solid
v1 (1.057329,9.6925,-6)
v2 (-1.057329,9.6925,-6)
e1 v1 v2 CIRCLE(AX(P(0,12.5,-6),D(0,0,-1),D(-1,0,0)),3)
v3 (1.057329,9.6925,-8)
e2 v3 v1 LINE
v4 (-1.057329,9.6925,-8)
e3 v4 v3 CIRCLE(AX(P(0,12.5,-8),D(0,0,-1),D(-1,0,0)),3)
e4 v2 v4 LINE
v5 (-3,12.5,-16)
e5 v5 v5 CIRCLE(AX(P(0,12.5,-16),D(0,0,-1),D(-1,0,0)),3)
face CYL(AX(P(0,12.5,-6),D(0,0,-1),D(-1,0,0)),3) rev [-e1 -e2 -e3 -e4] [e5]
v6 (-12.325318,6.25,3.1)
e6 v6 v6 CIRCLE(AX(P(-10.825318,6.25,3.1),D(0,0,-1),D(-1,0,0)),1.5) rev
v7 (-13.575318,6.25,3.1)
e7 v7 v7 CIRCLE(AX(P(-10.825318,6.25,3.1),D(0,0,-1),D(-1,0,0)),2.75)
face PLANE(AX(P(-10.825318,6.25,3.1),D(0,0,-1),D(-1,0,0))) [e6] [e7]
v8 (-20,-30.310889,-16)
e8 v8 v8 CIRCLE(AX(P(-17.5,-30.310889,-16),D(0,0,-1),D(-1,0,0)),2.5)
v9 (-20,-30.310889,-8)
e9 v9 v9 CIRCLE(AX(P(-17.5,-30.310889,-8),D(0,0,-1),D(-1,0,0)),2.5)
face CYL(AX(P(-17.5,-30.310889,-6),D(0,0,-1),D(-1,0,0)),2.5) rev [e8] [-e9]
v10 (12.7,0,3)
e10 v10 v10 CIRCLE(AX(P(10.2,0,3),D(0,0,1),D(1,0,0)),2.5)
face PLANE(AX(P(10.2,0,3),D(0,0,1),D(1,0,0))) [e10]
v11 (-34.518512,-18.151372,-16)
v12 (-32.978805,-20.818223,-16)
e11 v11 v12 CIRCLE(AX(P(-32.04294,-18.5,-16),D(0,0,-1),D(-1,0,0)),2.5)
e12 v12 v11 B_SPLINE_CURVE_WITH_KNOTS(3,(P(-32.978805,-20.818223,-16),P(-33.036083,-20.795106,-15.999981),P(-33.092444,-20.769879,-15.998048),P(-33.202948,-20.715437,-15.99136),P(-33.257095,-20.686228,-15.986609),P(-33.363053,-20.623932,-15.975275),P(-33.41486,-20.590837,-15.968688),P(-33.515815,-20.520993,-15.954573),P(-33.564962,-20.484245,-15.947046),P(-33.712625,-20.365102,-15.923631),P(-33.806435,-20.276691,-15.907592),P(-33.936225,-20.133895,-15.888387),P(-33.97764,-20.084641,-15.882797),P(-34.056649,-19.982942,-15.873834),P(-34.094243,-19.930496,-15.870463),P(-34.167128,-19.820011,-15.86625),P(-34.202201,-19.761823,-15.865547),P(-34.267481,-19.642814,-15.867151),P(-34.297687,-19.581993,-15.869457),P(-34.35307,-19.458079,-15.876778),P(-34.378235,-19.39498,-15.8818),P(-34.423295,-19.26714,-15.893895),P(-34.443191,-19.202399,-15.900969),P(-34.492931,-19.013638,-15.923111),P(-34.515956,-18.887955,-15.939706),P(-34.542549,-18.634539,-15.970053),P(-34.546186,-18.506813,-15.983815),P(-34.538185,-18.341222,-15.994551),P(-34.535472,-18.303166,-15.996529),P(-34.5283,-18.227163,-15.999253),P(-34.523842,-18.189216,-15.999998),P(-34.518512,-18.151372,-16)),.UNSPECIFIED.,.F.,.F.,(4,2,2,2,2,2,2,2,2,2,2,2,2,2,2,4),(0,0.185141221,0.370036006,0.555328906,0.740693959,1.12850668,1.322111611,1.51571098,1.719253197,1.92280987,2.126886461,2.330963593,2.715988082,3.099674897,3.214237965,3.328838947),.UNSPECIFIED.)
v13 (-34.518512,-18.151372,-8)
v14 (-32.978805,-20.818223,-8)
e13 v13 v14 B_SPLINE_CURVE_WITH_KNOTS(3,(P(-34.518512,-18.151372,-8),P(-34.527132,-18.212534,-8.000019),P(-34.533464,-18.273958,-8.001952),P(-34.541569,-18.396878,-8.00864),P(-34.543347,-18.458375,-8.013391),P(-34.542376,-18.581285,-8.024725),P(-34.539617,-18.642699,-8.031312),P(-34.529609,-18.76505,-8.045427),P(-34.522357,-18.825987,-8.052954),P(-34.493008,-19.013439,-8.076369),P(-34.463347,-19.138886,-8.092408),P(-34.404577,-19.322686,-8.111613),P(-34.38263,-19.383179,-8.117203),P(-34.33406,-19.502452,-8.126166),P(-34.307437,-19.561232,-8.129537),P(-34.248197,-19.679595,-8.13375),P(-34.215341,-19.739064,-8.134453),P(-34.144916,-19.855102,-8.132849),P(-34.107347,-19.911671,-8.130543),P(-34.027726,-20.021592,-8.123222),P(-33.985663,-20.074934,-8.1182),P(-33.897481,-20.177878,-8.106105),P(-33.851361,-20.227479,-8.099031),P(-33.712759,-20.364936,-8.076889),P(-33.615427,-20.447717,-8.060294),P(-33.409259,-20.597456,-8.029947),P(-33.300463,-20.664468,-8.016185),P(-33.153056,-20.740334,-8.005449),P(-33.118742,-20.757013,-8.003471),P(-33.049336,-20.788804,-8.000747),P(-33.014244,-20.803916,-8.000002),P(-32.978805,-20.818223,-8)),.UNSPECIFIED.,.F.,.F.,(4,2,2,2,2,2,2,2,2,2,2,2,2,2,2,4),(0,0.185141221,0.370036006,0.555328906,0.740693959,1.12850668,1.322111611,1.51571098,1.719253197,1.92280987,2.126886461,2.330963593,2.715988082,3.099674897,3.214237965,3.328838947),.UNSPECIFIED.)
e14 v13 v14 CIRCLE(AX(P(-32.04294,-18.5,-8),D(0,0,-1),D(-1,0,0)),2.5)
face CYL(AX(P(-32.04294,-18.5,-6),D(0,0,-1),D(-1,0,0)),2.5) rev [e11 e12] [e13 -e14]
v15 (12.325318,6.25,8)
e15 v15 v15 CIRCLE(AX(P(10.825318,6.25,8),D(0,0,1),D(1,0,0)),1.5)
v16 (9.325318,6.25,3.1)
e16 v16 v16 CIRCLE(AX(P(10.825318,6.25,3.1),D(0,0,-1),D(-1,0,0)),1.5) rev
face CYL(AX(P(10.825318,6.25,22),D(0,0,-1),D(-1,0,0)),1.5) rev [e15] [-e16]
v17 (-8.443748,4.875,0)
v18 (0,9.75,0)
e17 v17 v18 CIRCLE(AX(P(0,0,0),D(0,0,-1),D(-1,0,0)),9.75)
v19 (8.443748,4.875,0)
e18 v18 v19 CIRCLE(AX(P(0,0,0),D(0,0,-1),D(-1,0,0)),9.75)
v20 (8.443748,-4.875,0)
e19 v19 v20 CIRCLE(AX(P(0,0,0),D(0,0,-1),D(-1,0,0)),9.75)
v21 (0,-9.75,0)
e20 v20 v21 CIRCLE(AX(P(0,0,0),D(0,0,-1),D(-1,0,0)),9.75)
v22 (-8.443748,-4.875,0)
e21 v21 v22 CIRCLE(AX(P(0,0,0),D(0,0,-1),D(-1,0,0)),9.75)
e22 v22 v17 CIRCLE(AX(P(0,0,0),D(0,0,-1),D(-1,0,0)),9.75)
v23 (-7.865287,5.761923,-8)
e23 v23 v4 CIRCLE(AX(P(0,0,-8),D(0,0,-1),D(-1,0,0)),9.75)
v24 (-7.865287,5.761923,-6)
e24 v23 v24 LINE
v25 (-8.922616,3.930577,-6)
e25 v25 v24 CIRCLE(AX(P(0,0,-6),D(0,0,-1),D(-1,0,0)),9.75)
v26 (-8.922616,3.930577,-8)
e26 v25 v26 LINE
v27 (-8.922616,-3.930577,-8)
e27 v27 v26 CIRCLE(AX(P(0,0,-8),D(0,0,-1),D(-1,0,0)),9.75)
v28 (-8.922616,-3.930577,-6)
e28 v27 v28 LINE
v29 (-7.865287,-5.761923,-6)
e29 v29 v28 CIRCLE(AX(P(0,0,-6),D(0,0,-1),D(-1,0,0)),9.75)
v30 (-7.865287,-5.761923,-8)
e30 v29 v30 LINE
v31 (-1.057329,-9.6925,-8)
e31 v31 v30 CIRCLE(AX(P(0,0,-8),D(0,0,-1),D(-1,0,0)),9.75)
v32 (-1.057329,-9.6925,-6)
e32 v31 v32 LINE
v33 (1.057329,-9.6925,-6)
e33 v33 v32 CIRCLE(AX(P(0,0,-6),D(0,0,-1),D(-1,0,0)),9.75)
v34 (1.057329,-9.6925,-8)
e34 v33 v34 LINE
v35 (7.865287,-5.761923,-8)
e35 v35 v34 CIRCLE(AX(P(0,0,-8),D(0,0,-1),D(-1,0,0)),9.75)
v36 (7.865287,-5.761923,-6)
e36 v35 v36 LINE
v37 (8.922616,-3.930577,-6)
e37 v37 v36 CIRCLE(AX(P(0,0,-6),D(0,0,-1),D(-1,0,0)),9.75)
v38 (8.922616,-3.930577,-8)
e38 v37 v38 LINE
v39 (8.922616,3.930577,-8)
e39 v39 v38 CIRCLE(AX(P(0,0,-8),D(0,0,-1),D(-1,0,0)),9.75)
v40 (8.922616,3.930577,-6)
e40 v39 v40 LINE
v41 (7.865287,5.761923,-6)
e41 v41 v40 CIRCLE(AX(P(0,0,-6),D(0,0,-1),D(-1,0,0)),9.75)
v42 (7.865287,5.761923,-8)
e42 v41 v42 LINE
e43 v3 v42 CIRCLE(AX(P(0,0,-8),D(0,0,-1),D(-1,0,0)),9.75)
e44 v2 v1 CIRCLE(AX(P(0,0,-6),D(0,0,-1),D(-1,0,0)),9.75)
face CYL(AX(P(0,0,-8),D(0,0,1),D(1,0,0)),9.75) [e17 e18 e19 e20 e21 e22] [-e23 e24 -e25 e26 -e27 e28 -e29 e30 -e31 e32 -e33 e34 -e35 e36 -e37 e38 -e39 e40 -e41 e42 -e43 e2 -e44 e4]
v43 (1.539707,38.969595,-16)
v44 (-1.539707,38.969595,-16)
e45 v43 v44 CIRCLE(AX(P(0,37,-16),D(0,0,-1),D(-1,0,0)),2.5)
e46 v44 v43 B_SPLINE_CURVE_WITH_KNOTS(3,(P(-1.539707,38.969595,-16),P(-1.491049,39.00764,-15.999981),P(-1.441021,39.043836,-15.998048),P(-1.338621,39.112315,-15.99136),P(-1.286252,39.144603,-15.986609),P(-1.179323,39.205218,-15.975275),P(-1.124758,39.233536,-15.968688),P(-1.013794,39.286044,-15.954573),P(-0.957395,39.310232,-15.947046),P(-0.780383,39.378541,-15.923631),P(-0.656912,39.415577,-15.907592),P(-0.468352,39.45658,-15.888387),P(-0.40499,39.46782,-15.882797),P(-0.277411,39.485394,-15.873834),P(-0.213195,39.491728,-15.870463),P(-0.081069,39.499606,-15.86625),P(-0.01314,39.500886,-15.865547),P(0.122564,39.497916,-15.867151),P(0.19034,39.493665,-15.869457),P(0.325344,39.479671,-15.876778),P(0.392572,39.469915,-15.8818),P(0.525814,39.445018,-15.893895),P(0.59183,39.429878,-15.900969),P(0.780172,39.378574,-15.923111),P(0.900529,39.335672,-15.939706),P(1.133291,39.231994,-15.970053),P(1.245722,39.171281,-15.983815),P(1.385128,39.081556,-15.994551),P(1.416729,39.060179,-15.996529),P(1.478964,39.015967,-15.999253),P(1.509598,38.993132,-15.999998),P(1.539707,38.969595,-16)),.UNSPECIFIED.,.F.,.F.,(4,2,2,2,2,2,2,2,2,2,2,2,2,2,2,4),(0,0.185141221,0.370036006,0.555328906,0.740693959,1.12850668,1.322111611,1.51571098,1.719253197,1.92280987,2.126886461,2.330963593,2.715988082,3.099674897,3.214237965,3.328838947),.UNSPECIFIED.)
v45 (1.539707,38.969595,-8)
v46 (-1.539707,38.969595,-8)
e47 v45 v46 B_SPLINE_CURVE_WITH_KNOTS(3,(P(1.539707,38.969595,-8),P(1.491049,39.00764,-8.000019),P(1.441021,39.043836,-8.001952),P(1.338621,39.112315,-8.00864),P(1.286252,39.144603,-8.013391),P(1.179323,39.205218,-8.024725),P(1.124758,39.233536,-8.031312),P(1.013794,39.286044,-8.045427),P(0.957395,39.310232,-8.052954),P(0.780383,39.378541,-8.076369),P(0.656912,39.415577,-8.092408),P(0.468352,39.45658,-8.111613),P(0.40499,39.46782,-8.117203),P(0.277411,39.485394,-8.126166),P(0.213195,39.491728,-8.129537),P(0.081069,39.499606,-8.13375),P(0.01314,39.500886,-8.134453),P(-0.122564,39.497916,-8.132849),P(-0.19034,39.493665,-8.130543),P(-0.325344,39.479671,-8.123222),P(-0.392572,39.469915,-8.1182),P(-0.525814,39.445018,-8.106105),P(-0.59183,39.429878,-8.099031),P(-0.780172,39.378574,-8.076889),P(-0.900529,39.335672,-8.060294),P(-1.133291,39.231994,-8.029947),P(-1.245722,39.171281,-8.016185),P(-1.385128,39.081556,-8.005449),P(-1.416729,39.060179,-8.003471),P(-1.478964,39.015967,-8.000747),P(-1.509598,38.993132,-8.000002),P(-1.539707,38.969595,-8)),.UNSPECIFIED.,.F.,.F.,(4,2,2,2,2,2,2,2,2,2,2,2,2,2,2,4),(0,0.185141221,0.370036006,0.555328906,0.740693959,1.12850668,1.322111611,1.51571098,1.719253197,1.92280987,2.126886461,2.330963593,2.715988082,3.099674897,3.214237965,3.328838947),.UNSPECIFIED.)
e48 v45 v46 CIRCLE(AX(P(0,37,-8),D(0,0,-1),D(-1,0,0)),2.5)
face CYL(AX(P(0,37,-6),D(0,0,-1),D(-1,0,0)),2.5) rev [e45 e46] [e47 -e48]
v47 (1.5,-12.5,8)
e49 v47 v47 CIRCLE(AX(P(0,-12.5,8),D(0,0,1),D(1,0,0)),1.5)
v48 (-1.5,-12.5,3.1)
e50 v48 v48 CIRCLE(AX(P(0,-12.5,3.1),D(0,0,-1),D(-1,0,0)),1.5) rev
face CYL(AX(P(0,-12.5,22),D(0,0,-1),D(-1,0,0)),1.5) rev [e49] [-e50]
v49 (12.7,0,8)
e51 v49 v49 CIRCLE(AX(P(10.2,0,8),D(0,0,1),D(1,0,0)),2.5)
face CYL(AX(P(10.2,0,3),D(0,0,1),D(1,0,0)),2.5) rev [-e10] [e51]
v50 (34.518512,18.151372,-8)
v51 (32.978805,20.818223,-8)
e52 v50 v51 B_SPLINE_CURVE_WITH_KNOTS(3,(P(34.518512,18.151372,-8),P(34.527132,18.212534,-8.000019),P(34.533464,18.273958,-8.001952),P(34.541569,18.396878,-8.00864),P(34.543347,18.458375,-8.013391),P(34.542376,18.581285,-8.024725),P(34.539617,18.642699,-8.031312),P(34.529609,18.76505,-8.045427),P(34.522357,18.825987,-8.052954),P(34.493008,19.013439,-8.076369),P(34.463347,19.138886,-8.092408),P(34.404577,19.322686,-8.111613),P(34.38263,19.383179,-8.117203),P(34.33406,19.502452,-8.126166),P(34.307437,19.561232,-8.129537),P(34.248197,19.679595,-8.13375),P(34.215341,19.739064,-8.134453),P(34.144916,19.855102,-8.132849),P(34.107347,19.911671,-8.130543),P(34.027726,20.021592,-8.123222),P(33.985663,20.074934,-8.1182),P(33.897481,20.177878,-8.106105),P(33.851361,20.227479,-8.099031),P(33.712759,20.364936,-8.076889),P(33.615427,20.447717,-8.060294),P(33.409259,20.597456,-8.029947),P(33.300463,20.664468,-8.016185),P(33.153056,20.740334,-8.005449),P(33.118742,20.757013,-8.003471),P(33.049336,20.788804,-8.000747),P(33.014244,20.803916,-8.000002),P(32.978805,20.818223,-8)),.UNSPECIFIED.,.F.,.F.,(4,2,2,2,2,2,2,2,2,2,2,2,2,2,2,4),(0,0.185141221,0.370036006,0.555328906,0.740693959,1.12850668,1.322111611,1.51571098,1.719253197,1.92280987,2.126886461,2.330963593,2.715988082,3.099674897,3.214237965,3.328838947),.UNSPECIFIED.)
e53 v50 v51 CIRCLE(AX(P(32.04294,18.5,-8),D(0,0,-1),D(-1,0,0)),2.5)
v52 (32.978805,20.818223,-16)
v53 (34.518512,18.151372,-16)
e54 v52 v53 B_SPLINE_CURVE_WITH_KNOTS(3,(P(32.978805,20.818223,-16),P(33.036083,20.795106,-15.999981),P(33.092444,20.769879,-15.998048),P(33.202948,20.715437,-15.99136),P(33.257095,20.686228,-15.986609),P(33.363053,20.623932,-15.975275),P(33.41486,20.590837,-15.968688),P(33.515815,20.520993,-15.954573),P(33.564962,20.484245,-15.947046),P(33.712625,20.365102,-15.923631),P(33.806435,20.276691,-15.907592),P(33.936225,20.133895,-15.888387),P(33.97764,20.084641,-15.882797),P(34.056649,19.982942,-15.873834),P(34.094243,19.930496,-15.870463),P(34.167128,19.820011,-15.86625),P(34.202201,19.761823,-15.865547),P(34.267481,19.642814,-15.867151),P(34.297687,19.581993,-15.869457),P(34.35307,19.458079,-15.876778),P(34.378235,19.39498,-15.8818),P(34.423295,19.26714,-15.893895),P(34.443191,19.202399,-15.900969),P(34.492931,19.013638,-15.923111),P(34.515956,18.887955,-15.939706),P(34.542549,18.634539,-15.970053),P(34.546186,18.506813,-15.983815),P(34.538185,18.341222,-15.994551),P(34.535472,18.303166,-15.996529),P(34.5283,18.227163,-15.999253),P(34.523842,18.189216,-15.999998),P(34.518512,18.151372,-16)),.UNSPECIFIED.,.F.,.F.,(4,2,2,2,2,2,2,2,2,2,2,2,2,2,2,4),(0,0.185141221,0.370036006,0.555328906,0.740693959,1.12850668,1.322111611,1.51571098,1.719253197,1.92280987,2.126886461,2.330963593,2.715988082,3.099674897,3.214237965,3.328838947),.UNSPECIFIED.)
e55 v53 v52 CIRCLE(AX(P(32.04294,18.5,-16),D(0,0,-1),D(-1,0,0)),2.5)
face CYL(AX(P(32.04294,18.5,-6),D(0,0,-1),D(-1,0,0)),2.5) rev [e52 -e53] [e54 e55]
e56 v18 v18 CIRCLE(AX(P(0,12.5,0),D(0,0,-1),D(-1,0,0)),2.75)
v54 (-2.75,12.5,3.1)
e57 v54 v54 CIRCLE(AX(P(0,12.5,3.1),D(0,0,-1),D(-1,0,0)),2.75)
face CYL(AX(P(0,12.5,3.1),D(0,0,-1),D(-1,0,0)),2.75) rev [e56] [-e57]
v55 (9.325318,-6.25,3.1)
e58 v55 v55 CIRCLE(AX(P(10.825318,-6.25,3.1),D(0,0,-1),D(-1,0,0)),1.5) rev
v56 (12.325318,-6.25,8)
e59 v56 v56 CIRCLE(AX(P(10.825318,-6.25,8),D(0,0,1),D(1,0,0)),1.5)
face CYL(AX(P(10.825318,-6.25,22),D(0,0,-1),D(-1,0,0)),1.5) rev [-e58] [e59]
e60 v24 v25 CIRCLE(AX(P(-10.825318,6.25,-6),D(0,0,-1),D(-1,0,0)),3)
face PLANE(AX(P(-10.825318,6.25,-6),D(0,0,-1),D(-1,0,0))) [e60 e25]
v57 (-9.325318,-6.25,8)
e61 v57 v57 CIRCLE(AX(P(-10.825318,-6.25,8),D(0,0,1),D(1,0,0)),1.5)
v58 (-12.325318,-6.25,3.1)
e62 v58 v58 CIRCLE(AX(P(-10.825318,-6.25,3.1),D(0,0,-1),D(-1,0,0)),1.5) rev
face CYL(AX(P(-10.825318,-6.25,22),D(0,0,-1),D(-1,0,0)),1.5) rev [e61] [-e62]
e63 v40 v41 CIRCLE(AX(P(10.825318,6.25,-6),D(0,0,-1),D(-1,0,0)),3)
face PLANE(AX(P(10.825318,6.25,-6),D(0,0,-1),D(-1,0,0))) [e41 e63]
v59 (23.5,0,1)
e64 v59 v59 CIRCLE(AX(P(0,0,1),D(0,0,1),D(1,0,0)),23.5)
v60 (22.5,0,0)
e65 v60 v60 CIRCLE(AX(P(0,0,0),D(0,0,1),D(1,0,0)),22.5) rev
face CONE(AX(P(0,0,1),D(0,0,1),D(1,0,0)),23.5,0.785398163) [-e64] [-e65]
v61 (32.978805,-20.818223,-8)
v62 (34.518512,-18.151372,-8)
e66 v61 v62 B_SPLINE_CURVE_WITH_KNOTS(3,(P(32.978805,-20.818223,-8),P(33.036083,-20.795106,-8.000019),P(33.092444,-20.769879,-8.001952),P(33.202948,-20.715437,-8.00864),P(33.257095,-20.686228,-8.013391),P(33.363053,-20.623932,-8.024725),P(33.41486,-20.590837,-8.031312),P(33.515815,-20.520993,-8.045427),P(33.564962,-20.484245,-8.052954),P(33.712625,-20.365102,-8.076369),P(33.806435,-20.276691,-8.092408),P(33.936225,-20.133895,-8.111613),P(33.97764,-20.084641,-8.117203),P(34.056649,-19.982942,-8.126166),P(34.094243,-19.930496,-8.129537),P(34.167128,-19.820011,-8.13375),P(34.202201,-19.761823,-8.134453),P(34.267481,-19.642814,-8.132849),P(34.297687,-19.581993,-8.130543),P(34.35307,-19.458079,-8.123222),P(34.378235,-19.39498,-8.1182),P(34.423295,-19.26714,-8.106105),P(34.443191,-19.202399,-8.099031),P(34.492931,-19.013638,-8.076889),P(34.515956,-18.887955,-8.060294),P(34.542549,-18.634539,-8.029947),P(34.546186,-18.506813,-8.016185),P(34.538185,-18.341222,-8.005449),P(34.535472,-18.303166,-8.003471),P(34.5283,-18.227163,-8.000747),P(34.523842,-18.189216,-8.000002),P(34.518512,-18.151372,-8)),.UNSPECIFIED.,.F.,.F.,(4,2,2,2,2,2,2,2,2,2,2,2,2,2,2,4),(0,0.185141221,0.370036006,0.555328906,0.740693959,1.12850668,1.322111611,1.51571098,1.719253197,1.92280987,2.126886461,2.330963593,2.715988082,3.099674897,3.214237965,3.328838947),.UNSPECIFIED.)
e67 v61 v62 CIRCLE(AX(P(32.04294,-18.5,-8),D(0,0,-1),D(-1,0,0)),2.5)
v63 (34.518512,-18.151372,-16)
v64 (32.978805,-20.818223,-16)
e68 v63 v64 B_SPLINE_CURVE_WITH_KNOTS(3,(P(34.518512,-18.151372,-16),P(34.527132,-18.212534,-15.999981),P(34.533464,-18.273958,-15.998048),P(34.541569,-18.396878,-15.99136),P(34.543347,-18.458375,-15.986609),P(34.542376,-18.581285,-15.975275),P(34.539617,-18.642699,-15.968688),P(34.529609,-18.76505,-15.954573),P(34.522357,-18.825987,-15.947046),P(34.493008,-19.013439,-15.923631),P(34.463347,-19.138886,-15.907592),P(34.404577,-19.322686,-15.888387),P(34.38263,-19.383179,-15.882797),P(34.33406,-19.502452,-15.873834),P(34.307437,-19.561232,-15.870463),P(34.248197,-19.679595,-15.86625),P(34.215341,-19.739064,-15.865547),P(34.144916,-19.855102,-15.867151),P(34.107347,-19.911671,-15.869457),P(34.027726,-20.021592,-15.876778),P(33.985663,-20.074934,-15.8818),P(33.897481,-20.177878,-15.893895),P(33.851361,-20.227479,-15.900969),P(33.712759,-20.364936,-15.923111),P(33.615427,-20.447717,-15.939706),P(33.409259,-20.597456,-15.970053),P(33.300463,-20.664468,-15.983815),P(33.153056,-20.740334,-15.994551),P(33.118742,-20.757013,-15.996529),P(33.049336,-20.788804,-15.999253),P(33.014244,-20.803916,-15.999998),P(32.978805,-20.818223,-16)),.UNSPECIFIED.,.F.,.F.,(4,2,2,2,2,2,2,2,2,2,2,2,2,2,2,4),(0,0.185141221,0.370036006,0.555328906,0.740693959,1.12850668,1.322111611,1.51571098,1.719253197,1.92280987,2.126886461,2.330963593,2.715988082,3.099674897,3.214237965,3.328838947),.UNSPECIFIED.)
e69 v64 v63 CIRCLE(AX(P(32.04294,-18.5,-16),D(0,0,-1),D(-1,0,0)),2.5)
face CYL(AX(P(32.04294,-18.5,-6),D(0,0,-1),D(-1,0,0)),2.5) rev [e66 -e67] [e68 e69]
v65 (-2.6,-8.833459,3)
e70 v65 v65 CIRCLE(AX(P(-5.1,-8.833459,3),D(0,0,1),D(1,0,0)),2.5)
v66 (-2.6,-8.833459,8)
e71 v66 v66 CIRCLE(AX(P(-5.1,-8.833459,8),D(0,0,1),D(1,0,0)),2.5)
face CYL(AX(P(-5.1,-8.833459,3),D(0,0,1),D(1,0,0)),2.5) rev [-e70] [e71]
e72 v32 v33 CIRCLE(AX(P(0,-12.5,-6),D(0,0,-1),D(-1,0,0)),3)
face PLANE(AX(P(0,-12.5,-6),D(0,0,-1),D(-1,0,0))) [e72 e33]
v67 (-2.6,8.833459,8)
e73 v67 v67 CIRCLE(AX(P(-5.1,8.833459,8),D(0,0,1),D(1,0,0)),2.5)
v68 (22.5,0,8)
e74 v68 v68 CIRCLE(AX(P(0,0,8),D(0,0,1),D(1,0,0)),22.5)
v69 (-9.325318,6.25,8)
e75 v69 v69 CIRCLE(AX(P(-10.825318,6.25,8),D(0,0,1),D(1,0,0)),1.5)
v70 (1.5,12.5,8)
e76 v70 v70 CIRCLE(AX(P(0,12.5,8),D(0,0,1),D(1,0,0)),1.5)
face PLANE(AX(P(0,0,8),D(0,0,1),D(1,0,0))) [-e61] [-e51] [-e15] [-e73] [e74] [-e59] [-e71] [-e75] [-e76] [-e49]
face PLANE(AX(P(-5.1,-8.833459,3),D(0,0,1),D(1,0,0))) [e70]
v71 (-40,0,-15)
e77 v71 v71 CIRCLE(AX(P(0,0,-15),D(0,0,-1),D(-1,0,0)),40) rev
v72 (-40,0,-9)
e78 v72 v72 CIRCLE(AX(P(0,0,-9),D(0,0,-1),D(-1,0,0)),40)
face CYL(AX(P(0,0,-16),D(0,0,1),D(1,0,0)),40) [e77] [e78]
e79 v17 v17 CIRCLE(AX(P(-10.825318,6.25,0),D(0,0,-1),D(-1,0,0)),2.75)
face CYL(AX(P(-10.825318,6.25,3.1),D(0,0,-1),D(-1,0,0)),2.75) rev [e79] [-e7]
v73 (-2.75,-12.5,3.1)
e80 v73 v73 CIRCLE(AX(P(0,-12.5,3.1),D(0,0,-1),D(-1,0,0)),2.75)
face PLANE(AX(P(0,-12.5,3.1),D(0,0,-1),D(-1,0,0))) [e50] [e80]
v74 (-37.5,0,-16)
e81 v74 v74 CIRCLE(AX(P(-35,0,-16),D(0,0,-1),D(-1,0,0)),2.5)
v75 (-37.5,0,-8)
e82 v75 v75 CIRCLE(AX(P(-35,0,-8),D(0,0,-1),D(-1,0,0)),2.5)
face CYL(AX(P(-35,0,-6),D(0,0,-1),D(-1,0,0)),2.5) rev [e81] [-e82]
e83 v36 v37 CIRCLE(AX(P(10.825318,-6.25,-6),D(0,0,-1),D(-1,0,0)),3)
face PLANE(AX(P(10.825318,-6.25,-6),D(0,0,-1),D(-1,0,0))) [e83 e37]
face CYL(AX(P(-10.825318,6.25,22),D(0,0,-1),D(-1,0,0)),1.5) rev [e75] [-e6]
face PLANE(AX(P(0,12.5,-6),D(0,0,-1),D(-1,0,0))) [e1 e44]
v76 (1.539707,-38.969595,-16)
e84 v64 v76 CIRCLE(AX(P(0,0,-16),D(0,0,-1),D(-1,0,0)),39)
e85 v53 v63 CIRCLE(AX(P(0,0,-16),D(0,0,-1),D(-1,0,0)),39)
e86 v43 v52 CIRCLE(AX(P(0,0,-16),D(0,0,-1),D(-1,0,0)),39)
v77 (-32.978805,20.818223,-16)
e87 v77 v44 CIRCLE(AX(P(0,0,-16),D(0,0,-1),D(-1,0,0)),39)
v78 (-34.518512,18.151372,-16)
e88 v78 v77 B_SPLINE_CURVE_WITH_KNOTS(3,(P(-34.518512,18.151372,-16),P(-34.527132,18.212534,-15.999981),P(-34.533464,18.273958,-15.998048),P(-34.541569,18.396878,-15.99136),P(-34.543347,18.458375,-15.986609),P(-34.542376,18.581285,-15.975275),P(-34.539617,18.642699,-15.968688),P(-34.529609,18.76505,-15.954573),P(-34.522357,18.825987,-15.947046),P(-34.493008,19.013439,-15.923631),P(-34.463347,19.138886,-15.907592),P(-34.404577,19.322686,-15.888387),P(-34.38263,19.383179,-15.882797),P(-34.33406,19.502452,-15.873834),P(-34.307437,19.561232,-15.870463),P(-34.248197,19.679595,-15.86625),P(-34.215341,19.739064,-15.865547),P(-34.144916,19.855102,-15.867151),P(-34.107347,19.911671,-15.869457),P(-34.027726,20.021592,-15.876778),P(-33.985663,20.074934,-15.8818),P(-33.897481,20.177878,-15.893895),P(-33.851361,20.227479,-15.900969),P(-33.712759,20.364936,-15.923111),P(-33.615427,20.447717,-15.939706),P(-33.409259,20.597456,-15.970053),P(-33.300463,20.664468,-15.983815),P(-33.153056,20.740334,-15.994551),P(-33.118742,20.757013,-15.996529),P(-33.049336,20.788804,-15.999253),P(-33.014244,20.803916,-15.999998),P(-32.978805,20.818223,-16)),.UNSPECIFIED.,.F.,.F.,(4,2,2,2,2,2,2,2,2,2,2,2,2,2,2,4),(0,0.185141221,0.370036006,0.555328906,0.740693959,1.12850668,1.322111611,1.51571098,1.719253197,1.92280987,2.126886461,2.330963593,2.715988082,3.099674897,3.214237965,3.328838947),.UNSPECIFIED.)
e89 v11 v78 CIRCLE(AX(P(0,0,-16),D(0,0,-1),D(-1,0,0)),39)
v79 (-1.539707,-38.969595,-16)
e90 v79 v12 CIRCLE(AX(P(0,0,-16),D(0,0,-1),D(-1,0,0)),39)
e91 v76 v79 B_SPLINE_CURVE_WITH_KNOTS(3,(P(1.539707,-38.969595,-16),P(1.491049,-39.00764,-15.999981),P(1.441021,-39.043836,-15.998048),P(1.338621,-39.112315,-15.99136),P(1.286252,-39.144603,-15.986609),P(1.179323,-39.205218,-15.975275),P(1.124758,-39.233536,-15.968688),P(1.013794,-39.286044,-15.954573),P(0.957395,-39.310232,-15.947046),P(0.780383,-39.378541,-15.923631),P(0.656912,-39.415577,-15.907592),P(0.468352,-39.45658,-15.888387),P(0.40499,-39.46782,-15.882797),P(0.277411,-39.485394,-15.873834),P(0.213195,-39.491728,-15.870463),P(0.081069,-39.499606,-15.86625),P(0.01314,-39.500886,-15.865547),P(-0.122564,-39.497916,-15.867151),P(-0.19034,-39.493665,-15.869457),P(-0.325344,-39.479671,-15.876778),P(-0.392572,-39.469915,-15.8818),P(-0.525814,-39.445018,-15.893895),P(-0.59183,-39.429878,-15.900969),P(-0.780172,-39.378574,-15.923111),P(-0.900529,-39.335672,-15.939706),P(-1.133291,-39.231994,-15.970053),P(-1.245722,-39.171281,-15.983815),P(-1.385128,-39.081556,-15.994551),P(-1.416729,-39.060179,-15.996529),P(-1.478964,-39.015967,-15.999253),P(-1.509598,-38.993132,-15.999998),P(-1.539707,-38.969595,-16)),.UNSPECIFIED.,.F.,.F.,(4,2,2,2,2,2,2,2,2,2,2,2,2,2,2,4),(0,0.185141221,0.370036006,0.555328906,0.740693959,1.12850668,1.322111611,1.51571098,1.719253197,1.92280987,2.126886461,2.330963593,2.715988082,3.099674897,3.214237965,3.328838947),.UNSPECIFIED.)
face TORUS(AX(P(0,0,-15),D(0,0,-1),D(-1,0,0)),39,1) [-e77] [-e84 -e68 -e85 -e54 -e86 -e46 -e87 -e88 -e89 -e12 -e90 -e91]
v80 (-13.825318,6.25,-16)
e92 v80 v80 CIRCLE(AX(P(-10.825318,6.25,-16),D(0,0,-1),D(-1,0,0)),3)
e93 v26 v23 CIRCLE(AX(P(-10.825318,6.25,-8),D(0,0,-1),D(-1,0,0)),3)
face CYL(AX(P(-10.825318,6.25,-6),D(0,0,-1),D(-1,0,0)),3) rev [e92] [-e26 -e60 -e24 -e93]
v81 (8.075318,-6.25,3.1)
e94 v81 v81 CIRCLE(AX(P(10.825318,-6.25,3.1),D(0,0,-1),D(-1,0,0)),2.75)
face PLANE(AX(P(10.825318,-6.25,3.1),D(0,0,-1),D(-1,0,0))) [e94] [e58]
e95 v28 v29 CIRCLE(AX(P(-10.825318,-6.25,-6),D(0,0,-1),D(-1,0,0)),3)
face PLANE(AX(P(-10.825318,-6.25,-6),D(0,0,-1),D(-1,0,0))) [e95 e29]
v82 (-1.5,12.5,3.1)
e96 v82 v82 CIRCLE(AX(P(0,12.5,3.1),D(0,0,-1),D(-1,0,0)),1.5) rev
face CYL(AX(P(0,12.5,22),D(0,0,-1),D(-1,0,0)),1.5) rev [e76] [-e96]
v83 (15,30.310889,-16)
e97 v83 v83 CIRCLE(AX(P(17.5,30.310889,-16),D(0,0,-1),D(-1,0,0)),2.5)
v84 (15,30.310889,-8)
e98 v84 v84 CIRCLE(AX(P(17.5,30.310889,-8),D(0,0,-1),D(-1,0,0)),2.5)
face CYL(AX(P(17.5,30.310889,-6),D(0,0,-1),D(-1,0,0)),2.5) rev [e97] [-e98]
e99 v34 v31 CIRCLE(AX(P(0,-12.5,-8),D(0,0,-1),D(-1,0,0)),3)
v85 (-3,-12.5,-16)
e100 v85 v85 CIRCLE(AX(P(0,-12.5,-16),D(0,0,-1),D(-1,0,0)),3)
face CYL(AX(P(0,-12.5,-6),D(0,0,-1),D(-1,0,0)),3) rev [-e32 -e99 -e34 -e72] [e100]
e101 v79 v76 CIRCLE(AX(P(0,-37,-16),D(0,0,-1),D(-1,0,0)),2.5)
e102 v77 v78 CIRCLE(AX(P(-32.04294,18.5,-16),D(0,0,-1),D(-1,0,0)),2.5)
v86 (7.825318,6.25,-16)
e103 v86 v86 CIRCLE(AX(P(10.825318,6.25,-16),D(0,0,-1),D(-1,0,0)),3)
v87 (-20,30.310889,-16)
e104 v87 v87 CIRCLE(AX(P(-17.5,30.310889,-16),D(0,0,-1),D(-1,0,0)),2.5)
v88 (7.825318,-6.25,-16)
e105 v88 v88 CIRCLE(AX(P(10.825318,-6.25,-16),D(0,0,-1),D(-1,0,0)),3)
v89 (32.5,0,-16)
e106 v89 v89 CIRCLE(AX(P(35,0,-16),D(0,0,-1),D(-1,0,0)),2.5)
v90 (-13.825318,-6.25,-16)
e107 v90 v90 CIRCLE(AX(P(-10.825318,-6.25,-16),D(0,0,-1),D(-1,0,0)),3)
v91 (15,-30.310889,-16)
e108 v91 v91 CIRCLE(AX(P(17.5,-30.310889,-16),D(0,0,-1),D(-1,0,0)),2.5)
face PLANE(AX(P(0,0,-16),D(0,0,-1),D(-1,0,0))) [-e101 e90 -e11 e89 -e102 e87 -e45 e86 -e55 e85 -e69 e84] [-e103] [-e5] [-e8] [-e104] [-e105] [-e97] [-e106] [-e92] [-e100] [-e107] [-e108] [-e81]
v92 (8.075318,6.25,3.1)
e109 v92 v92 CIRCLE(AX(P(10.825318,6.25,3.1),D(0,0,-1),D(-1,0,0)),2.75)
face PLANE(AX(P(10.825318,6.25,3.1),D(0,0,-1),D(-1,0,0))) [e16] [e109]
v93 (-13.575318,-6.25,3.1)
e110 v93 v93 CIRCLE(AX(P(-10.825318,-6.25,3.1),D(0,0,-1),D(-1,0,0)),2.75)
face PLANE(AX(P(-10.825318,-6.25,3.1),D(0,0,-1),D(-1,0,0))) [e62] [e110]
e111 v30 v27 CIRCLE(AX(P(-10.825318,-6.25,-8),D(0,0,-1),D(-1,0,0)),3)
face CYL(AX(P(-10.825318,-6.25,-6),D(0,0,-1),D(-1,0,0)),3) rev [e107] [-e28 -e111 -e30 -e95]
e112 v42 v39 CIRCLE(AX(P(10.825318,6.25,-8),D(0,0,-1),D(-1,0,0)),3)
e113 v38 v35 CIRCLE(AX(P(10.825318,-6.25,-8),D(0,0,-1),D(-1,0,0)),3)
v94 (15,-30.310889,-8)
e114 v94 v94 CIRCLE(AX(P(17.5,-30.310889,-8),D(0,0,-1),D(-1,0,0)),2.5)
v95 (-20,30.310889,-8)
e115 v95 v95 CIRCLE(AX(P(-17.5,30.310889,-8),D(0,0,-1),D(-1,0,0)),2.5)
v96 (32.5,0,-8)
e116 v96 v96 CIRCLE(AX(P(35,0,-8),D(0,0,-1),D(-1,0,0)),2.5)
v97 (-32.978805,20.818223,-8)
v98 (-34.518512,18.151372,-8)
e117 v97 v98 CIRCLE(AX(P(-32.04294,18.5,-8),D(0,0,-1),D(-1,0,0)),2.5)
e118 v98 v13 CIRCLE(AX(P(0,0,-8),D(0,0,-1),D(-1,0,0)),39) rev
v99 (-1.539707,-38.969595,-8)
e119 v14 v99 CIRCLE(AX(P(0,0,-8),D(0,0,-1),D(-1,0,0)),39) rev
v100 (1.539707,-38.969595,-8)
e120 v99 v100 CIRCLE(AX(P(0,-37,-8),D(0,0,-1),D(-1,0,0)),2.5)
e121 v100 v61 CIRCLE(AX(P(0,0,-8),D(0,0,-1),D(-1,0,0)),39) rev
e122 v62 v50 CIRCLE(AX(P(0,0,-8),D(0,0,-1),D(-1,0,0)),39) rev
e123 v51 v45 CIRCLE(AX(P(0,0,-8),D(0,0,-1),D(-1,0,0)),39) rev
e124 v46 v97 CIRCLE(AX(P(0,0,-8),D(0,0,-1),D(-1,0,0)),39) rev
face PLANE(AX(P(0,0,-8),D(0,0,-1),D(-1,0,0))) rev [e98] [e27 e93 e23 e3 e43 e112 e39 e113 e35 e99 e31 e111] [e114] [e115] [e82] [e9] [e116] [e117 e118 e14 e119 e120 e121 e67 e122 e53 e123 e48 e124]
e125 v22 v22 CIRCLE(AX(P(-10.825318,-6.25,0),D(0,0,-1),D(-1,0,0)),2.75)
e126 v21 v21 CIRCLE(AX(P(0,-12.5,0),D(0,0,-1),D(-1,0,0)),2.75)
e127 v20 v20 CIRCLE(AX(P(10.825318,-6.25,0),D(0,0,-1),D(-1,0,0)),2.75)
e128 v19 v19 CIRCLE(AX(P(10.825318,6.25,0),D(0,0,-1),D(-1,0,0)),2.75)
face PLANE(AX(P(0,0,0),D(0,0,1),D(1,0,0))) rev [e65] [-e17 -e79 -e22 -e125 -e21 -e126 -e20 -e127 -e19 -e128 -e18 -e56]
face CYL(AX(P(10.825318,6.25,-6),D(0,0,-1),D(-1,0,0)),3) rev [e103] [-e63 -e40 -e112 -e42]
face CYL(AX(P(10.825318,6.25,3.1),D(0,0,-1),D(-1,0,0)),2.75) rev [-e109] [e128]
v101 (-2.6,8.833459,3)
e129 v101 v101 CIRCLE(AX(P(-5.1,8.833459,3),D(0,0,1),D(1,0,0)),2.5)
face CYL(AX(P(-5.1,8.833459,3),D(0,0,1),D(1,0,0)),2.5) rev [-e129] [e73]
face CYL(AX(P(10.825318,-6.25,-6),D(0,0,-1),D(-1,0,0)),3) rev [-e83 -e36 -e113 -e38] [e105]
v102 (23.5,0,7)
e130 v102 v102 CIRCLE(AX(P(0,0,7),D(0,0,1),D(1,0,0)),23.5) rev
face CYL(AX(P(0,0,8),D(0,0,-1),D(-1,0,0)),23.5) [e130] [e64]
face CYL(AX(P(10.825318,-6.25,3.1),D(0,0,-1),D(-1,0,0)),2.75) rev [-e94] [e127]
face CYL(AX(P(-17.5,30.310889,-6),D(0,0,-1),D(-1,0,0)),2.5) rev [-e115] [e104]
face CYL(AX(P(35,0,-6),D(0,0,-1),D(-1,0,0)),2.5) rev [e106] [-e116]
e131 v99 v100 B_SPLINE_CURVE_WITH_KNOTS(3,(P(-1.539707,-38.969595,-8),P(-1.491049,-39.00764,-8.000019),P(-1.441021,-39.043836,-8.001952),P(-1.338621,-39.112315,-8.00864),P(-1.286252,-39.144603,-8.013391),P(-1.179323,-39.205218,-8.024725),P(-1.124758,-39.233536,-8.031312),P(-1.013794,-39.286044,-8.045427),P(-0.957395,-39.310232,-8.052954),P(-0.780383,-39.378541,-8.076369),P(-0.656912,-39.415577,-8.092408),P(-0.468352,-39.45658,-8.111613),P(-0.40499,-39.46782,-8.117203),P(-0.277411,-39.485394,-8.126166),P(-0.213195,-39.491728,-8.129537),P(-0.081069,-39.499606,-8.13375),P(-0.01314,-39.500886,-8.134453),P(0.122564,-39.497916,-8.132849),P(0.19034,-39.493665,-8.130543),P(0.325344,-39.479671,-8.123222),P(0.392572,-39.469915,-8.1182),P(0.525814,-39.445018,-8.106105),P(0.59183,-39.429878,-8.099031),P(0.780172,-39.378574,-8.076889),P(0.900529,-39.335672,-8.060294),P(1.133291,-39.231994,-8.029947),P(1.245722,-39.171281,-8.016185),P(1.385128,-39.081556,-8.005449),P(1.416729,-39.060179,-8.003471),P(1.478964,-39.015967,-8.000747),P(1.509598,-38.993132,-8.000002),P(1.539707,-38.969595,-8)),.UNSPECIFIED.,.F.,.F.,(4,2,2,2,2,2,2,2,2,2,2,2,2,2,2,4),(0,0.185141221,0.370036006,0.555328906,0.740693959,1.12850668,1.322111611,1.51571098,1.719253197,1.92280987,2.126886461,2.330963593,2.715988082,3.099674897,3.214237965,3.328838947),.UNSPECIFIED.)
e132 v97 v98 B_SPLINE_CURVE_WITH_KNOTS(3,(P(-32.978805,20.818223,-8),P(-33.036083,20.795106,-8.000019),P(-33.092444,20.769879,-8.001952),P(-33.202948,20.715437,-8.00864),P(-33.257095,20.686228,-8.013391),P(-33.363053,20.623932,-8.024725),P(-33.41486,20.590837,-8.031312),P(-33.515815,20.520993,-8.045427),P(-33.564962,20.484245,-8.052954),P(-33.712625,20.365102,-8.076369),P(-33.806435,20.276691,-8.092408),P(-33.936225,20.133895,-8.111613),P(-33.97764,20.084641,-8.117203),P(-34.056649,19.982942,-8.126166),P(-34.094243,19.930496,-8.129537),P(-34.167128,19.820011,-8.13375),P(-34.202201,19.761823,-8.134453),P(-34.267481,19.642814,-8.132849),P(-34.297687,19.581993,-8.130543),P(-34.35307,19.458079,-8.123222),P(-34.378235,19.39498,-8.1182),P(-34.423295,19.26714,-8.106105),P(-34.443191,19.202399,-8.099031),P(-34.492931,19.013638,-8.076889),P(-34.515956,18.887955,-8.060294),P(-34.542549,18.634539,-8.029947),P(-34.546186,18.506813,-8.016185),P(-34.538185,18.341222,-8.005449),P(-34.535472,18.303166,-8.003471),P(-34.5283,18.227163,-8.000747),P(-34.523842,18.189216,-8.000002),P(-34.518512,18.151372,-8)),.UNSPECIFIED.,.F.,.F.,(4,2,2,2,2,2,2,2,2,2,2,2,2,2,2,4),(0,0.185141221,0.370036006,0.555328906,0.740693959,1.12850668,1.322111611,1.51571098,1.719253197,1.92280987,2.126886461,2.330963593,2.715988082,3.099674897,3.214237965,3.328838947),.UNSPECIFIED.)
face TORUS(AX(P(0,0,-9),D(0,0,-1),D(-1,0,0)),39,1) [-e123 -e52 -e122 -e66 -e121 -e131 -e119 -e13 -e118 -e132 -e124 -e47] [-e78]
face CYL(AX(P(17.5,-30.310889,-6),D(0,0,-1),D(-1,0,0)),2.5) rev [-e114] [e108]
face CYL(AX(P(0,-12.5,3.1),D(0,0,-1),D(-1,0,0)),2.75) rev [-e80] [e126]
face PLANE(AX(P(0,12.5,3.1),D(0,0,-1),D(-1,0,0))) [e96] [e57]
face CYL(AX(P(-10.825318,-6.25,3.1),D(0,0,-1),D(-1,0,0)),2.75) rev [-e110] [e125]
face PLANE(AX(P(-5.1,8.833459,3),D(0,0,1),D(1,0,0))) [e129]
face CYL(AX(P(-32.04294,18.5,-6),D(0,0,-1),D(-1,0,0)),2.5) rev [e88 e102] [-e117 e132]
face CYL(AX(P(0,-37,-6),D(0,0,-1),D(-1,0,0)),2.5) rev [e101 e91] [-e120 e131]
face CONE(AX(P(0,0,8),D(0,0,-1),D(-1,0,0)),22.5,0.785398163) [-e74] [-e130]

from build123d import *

# Parameters (mm, degrees)
SKETCH_1_R           = 23.5
EXTRUDE_3_DEPTH      = 8
SKETCH_2_R           = 0.75
CUT_EXTRUDE_1_DEPTH  = 22
SKETCH_3_R           = 1.5
CUT_EXTRUDE_2_DEPTH  = 22
SKETCH_4_R           = 1.5
CUT_EXTRUDE_3_DEPTH  = 22
SKETCH_6_R           = 1.5
CUT_EXTRUDE_4_DEPTH  = 22
SKETCH_7_R           = 1.5
CUT_EXTRUDE_5_DEPTH  = 22
SKETCH_8_R           = 1.5
CUT_EXTRUDE_6_DEPTH  = 22
SKETCH_9_R           = 1.5
CUT_EXTRUDE_7_DEPTH  = 22
SKETCH_12_R          = 2.75
CUT_EXTRUDE_9_DEPTH  = 3.1
SKETCH_14_W          = 0.501617195
SKETCH_14_H          = 0.723644477
EXTRUDE_4_DEPTH      = 3.1
SKETCH_15_R          = 0.546789956
CUT_EXTRUDE_10_DEPTH = 3.1
SKETCH_16_R          = 2.75
CUT_EXTRUDE_11_DEPTH = 3.1
SKETCH_17_R          = 2.75
CUT_EXTRUDE_12_DEPTH = 3.1
SKETCH_18_R          = 2.75
CUT_EXTRUDE_13_DEPTH = 3.1
SKETCH_19_R          = 2.75
CUT_EXTRUDE_14_DEPTH = 3.1
SKETCH_20_R          = 2.75
CUT_EXTRUDE_15_DEPTH = 3.1
SKETCH_21_R          = 2.5
CUT_EXTRUDE_17_DEPTH = 5
SKETCH_22_R          = 9.75
EXTRUDE_5_DEPTH      = 8
SKETCH_23_R          = 40
EXTRUDE_6_DEPTH      = 8
SKETCH_25_R          = 3
CUT_EXTRUDE_18_DEPTH = 10
SKETCH_26_R          = 2.5
CUT_EXTRUDE_19_DEPTH = 10
CHAMFER_1_SIZE       = 1
CHAMFER_2_SIZE       = 1
FILLET_1_R           = 1
FILLET_2_R           = 1


with BuildPart() as part:
    # 草图1 → 凸台-拉伸3 (new body)
    with BuildSketch(Plane.XY):
        Circle(SKETCH_1_R)
    extrude(amount=EXTRUDE_3_DEPTH)

    # 草图2 → 切除-拉伸1 (cut)
    with BuildSketch(Plane(origin=(0, 0, 0), x_dir=(-1, 0, 0), z_dir=(0, 0, -1))):
        with Locations((0, 12.5)):
            Circle(SKETCH_2_R)
        with Locations((10.825317547, 6.25)):
            Circle(SKETCH_2_R)
        with Locations((10.825317547, -6.25)):
            Circle(SKETCH_2_R)
        with Locations((0, -12.5)):
            Circle(SKETCH_2_R)
        with Locations((-10.825317547, -6.25)):
            Circle(SKETCH_2_R)
        with Locations((-10.825317547, 6.25)):
            Circle(SKETCH_2_R)
    extrude(amount=-CUT_EXTRUDE_1_DEPTH, mode=Mode.SUBTRACT)

    # 草图3 → 切除-拉伸2 (cut)
    with BuildSketch(Plane(origin=(0, 0, 0), x_dir=(-1, 0, 0), z_dir=(0, 0, -1))):
        with Locations((-10.825317547, 6.25)):
            Circle(SKETCH_3_R)
    extrude(amount=-CUT_EXTRUDE_2_DEPTH, mode=Mode.SUBTRACT)

    # 草图4 → 切除-拉伸3 (cut)
    with BuildSketch(Plane(origin=(0, 0, 0), x_dir=(-1, 0, 0), z_dir=(0, 0, -1))):
        with Locations((0, 12.5)):
            Circle(SKETCH_4_R)
    extrude(amount=-CUT_EXTRUDE_3_DEPTH, mode=Mode.SUBTRACT)

    # 草图6 → 切除-拉伸4 (cut)
    with BuildSketch(Plane(origin=(0, 0, 0), x_dir=(-1, 0, 0), z_dir=(0, 0, -1))):
        with Locations((10.825317547, 6.25)):
            Circle(SKETCH_6_R)
    extrude(amount=-CUT_EXTRUDE_4_DEPTH, mode=Mode.SUBTRACT)

    # 草图7 → 切除-拉伸5 (cut)
    with BuildSketch(Plane(origin=(0, 0, 0), x_dir=(-1, 0, 0), z_dir=(0, 0, -1))):
        with Locations((-10.825317547, -6.25)):
            Circle(SKETCH_7_R)
    extrude(amount=-CUT_EXTRUDE_5_DEPTH, mode=Mode.SUBTRACT)

    # 草图8 → 切除-拉伸6 (cut)
    with BuildSketch(Plane(origin=(0, 0, 0), x_dir=(-1, 0, 0), z_dir=(0, 0, -1))):
        with Locations((0, -12.5)):
            Circle(SKETCH_8_R)
    extrude(amount=-CUT_EXTRUDE_6_DEPTH, mode=Mode.SUBTRACT)

    # 草图9 → 切除-拉伸7 (cut)
    with BuildSketch(Plane(origin=(0, 0, 0), x_dir=(-1, 0, 0), z_dir=(0, 0, -1))):
        with Locations((10.825317547, -6.25)):
            Circle(SKETCH_9_R)
    extrude(amount=-CUT_EXTRUDE_7_DEPTH, mode=Mode.SUBTRACT)

    # 草图12 → 切除-拉伸9 (cut)
    with BuildSketch(Plane(origin=(0, 0, 0), x_dir=(-1, 0, 0), z_dir=(0, 0, -1))):
        with Locations((-10.825317547, 6.25)):
            Circle(SKETCH_12_R)
    extrude(amount=-CUT_EXTRUDE_9_DEPTH, mode=Mode.SUBTRACT)

    # 草图14 → 凸台-拉伸4 (add)
    with BuildSketch(Plane(origin=(0, 0, 3.1), x_dir=(-1, 0, 0), z_dir=(0, 0, -1))):
        with Locations((-12.614129252, 7.316642522)):
            Rectangle(SKETCH_14_W, SKETCH_14_H)
    extrude(amount=EXTRUDE_4_DEPTH)

    # 草图15 → 切除-拉伸10 (cut)
    with BuildSketch(Plane(origin=(0, 0, 0), x_dir=(-1, 0, 0), z_dir=(0, 0, -1))):
        with Locations((-12.623375944, 7.373337159)):
            Circle(SKETCH_15_R)
    extrude(amount=-CUT_EXTRUDE_10_DEPTH, mode=Mode.SUBTRACT)

    # 草图16 → 切除-拉伸11 (cut)
    with BuildSketch(Plane(origin=(0, 0, 0), x_dir=(-1, 0, 0), z_dir=(0, 0, -1))):
        with Locations((0, 12.5)):
            Circle(SKETCH_16_R)
    extrude(amount=-CUT_EXTRUDE_11_DEPTH, mode=Mode.SUBTRACT)

    # 草图17 → 切除-拉伸12 (cut)
    with BuildSketch(Plane(origin=(0, 0, 0), x_dir=(-1, 0, 0), z_dir=(0, 0, -1))):
        with Locations((10.825317547, 6.25)):
            Circle(SKETCH_17_R)
    extrude(amount=-CUT_EXTRUDE_12_DEPTH, mode=Mode.SUBTRACT)

    # 草图18 → 切除-拉伸13 (cut)
    with BuildSketch(Plane(origin=(0, 0, 0), x_dir=(-1, 0, 0), z_dir=(0, 0, -1))):
        with Locations((10.825317547, -6.25)):
            Circle(SKETCH_18_R)
    extrude(amount=-CUT_EXTRUDE_13_DEPTH, mode=Mode.SUBTRACT)

    # 草图19 → 切除-拉伸14 (cut)
    with BuildSketch(Plane(origin=(0, 0, 0), x_dir=(-1, 0, 0), z_dir=(0, 0, -1))):
        with Locations((0, -12.5)):
            Circle(SKETCH_19_R)
    extrude(amount=-CUT_EXTRUDE_14_DEPTH, mode=Mode.SUBTRACT)

    # 草图20 → 切除-拉伸15 (cut)
    with BuildSketch(Plane(origin=(0, 0, 0), x_dir=(-1, 0, 0), z_dir=(0, 0, -1))):
        with Locations((-10.825317547, -6.25)):
            Circle(SKETCH_20_R)
    extrude(amount=-CUT_EXTRUDE_15_DEPTH, mode=Mode.SUBTRACT)

    # 草图21 → 切除-拉伸17 (cut)
    with BuildSketch(Plane.XY.offset(8)):
        with Locations((10.2, 0)):
            Circle(SKETCH_21_R)
        with Locations((-5.1, 8.833459119)):
            Circle(SKETCH_21_R)
        with Locations((-5.1, -8.833459119)):
            Circle(SKETCH_21_R)
    extrude(amount=-CUT_EXTRUDE_17_DEPTH, mode=Mode.SUBTRACT)

    # 草图22 → 凸台-拉伸5 (add)
    with BuildSketch(Plane(origin=(0, 0, 0), x_dir=(-1, 0, 0), z_dir=(0, 0, -1))):
        with Locations(Location((0, 0, 0), (0, 0, 209.999878299))):
            Circle(SKETCH_22_R)
    extrude(amount=EXTRUDE_5_DEPTH)

    # 草图23 → 凸台-拉伸6 (add)
    with BuildSketch(Plane(origin=(0, 0, -8), x_dir=(-1, 0, 0), z_dir=(0, 0, -1))):
        Circle(SKETCH_23_R)
    extrude(amount=EXTRUDE_6_DEPTH)

    # 草图25 → 切除-拉伸18 (cut)
    with BuildSketch(Plane(origin=(0, 0, -16), x_dir=(-1, 0, 0), z_dir=(0, 0, -1))):
        with Locations((0, 12.5)):
            Circle(SKETCH_25_R)
        with Locations((0, -12.5)):
            Circle(SKETCH_25_R)
        with Locations((10.825317547, 6.25)):
            Circle(SKETCH_25_R)
        with Locations((10.825317547, -6.25)):
            Circle(SKETCH_25_R)
        with Locations((-10.825317547, 6.25)):
            Circle(SKETCH_25_R)
        with Locations((-10.825317547, -6.25)):
            Circle(SKETCH_25_R)
    extrude(amount=-CUT_EXTRUDE_18_DEPTH, mode=Mode.SUBTRACT)

    # 草图26 → 切除-拉伸19 (cut)
    with BuildSketch(Plane(origin=(0, 0, -16), x_dir=(-1, 0, 0), z_dir=(0, 0, -1))):
        with Locations((0, 37)):
            Circle(SKETCH_26_R)
        with Locations((17.5, 30.310889132)):
            Circle(SKETCH_26_R)
        with Locations((32.04293994, 18.5)):
            Circle(SKETCH_26_R)
        with Locations((35, 0)):
            Circle(SKETCH_26_R)
        with Locations((32.04293994, -18.5)):
            Circle(SKETCH_26_R)
        with Locations((17.5, -30.310889132)):
            Circle(SKETCH_26_R)
        with Locations((0, -37)):
            Circle(SKETCH_26_R)
        with Locations((-17.5, -30.310889132)):
            Circle(SKETCH_26_R)
        with Locations((-32.04293994, -18.5)):
            Circle(SKETCH_26_R)
        with Locations((-35, 0)):
            Circle(SKETCH_26_R)
        with Locations((-32.04293994, 18.5)):
            Circle(SKETCH_26_R)
        with Locations((-17.5, 30.310889132)):
            Circle(SKETCH_26_R)
    extrude(amount=-CUT_EXTRUDE_19_DEPTH, mode=Mode.SUBTRACT)

    # 倒角1
    chamfer_1_edges = [part.edges().sort_by_distance(p)[0] for p in [
        (-23.5, 0, 8),
    ]]
    chamfer(chamfer_1_edges, length=CHAMFER_1_SIZE)

    # 倒角2
    chamfer_2_edges = [part.edges().sort_by_distance(p)[0] for p in [
        (-23.5, 0, 0),
    ]]
    chamfer(chamfer_2_edges, length=CHAMFER_2_SIZE)

    # 圆角1
    # the kernel refuses this fillet: 1 mm, written as the material it takes off along each edge
    with BuildSketch(Plane(origin=(0, 0, -8), x_dir=(-1, 0, 0), z_dir=(0, -1, 0))) as fillet_1_piece_1:
        with BuildLine():
            CenterArc((40 - FILLET_1_R, FILLET_1_R), FILLET_1_R, 270, 90)
            Line((40, FILLET_1_R), (40, 0))
            Line((40, 0), (40 - FILLET_1_R, 0))
        make_face()
    revolve(axis=Axis((0, 0, -8), (0, 0, -1)), mode=Mode.SUBTRACT)

    # 圆角2
    # the kernel refuses this fillet: 1 mm, written as the material it takes off along each edge
    with BuildSketch(Plane(origin=(0, 0, -16), x_dir=(-1, 0, 0), z_dir=(0, -1, 0))) as fillet_2_piece_1:
        with BuildLine():
            CenterArc((40 - FILLET_2_R, -FILLET_2_R), FILLET_2_R, 0, 90)
            Line((40, -FILLET_2_R), (40, 0))
            Line((40, 0), (40 - FILLET_2_R, 0))
        make_face()
    revolve(axis=Axis((0, 0, -16), (0, 0, -1)), mode=Mode.SUBTRACT)


solid = part.part
